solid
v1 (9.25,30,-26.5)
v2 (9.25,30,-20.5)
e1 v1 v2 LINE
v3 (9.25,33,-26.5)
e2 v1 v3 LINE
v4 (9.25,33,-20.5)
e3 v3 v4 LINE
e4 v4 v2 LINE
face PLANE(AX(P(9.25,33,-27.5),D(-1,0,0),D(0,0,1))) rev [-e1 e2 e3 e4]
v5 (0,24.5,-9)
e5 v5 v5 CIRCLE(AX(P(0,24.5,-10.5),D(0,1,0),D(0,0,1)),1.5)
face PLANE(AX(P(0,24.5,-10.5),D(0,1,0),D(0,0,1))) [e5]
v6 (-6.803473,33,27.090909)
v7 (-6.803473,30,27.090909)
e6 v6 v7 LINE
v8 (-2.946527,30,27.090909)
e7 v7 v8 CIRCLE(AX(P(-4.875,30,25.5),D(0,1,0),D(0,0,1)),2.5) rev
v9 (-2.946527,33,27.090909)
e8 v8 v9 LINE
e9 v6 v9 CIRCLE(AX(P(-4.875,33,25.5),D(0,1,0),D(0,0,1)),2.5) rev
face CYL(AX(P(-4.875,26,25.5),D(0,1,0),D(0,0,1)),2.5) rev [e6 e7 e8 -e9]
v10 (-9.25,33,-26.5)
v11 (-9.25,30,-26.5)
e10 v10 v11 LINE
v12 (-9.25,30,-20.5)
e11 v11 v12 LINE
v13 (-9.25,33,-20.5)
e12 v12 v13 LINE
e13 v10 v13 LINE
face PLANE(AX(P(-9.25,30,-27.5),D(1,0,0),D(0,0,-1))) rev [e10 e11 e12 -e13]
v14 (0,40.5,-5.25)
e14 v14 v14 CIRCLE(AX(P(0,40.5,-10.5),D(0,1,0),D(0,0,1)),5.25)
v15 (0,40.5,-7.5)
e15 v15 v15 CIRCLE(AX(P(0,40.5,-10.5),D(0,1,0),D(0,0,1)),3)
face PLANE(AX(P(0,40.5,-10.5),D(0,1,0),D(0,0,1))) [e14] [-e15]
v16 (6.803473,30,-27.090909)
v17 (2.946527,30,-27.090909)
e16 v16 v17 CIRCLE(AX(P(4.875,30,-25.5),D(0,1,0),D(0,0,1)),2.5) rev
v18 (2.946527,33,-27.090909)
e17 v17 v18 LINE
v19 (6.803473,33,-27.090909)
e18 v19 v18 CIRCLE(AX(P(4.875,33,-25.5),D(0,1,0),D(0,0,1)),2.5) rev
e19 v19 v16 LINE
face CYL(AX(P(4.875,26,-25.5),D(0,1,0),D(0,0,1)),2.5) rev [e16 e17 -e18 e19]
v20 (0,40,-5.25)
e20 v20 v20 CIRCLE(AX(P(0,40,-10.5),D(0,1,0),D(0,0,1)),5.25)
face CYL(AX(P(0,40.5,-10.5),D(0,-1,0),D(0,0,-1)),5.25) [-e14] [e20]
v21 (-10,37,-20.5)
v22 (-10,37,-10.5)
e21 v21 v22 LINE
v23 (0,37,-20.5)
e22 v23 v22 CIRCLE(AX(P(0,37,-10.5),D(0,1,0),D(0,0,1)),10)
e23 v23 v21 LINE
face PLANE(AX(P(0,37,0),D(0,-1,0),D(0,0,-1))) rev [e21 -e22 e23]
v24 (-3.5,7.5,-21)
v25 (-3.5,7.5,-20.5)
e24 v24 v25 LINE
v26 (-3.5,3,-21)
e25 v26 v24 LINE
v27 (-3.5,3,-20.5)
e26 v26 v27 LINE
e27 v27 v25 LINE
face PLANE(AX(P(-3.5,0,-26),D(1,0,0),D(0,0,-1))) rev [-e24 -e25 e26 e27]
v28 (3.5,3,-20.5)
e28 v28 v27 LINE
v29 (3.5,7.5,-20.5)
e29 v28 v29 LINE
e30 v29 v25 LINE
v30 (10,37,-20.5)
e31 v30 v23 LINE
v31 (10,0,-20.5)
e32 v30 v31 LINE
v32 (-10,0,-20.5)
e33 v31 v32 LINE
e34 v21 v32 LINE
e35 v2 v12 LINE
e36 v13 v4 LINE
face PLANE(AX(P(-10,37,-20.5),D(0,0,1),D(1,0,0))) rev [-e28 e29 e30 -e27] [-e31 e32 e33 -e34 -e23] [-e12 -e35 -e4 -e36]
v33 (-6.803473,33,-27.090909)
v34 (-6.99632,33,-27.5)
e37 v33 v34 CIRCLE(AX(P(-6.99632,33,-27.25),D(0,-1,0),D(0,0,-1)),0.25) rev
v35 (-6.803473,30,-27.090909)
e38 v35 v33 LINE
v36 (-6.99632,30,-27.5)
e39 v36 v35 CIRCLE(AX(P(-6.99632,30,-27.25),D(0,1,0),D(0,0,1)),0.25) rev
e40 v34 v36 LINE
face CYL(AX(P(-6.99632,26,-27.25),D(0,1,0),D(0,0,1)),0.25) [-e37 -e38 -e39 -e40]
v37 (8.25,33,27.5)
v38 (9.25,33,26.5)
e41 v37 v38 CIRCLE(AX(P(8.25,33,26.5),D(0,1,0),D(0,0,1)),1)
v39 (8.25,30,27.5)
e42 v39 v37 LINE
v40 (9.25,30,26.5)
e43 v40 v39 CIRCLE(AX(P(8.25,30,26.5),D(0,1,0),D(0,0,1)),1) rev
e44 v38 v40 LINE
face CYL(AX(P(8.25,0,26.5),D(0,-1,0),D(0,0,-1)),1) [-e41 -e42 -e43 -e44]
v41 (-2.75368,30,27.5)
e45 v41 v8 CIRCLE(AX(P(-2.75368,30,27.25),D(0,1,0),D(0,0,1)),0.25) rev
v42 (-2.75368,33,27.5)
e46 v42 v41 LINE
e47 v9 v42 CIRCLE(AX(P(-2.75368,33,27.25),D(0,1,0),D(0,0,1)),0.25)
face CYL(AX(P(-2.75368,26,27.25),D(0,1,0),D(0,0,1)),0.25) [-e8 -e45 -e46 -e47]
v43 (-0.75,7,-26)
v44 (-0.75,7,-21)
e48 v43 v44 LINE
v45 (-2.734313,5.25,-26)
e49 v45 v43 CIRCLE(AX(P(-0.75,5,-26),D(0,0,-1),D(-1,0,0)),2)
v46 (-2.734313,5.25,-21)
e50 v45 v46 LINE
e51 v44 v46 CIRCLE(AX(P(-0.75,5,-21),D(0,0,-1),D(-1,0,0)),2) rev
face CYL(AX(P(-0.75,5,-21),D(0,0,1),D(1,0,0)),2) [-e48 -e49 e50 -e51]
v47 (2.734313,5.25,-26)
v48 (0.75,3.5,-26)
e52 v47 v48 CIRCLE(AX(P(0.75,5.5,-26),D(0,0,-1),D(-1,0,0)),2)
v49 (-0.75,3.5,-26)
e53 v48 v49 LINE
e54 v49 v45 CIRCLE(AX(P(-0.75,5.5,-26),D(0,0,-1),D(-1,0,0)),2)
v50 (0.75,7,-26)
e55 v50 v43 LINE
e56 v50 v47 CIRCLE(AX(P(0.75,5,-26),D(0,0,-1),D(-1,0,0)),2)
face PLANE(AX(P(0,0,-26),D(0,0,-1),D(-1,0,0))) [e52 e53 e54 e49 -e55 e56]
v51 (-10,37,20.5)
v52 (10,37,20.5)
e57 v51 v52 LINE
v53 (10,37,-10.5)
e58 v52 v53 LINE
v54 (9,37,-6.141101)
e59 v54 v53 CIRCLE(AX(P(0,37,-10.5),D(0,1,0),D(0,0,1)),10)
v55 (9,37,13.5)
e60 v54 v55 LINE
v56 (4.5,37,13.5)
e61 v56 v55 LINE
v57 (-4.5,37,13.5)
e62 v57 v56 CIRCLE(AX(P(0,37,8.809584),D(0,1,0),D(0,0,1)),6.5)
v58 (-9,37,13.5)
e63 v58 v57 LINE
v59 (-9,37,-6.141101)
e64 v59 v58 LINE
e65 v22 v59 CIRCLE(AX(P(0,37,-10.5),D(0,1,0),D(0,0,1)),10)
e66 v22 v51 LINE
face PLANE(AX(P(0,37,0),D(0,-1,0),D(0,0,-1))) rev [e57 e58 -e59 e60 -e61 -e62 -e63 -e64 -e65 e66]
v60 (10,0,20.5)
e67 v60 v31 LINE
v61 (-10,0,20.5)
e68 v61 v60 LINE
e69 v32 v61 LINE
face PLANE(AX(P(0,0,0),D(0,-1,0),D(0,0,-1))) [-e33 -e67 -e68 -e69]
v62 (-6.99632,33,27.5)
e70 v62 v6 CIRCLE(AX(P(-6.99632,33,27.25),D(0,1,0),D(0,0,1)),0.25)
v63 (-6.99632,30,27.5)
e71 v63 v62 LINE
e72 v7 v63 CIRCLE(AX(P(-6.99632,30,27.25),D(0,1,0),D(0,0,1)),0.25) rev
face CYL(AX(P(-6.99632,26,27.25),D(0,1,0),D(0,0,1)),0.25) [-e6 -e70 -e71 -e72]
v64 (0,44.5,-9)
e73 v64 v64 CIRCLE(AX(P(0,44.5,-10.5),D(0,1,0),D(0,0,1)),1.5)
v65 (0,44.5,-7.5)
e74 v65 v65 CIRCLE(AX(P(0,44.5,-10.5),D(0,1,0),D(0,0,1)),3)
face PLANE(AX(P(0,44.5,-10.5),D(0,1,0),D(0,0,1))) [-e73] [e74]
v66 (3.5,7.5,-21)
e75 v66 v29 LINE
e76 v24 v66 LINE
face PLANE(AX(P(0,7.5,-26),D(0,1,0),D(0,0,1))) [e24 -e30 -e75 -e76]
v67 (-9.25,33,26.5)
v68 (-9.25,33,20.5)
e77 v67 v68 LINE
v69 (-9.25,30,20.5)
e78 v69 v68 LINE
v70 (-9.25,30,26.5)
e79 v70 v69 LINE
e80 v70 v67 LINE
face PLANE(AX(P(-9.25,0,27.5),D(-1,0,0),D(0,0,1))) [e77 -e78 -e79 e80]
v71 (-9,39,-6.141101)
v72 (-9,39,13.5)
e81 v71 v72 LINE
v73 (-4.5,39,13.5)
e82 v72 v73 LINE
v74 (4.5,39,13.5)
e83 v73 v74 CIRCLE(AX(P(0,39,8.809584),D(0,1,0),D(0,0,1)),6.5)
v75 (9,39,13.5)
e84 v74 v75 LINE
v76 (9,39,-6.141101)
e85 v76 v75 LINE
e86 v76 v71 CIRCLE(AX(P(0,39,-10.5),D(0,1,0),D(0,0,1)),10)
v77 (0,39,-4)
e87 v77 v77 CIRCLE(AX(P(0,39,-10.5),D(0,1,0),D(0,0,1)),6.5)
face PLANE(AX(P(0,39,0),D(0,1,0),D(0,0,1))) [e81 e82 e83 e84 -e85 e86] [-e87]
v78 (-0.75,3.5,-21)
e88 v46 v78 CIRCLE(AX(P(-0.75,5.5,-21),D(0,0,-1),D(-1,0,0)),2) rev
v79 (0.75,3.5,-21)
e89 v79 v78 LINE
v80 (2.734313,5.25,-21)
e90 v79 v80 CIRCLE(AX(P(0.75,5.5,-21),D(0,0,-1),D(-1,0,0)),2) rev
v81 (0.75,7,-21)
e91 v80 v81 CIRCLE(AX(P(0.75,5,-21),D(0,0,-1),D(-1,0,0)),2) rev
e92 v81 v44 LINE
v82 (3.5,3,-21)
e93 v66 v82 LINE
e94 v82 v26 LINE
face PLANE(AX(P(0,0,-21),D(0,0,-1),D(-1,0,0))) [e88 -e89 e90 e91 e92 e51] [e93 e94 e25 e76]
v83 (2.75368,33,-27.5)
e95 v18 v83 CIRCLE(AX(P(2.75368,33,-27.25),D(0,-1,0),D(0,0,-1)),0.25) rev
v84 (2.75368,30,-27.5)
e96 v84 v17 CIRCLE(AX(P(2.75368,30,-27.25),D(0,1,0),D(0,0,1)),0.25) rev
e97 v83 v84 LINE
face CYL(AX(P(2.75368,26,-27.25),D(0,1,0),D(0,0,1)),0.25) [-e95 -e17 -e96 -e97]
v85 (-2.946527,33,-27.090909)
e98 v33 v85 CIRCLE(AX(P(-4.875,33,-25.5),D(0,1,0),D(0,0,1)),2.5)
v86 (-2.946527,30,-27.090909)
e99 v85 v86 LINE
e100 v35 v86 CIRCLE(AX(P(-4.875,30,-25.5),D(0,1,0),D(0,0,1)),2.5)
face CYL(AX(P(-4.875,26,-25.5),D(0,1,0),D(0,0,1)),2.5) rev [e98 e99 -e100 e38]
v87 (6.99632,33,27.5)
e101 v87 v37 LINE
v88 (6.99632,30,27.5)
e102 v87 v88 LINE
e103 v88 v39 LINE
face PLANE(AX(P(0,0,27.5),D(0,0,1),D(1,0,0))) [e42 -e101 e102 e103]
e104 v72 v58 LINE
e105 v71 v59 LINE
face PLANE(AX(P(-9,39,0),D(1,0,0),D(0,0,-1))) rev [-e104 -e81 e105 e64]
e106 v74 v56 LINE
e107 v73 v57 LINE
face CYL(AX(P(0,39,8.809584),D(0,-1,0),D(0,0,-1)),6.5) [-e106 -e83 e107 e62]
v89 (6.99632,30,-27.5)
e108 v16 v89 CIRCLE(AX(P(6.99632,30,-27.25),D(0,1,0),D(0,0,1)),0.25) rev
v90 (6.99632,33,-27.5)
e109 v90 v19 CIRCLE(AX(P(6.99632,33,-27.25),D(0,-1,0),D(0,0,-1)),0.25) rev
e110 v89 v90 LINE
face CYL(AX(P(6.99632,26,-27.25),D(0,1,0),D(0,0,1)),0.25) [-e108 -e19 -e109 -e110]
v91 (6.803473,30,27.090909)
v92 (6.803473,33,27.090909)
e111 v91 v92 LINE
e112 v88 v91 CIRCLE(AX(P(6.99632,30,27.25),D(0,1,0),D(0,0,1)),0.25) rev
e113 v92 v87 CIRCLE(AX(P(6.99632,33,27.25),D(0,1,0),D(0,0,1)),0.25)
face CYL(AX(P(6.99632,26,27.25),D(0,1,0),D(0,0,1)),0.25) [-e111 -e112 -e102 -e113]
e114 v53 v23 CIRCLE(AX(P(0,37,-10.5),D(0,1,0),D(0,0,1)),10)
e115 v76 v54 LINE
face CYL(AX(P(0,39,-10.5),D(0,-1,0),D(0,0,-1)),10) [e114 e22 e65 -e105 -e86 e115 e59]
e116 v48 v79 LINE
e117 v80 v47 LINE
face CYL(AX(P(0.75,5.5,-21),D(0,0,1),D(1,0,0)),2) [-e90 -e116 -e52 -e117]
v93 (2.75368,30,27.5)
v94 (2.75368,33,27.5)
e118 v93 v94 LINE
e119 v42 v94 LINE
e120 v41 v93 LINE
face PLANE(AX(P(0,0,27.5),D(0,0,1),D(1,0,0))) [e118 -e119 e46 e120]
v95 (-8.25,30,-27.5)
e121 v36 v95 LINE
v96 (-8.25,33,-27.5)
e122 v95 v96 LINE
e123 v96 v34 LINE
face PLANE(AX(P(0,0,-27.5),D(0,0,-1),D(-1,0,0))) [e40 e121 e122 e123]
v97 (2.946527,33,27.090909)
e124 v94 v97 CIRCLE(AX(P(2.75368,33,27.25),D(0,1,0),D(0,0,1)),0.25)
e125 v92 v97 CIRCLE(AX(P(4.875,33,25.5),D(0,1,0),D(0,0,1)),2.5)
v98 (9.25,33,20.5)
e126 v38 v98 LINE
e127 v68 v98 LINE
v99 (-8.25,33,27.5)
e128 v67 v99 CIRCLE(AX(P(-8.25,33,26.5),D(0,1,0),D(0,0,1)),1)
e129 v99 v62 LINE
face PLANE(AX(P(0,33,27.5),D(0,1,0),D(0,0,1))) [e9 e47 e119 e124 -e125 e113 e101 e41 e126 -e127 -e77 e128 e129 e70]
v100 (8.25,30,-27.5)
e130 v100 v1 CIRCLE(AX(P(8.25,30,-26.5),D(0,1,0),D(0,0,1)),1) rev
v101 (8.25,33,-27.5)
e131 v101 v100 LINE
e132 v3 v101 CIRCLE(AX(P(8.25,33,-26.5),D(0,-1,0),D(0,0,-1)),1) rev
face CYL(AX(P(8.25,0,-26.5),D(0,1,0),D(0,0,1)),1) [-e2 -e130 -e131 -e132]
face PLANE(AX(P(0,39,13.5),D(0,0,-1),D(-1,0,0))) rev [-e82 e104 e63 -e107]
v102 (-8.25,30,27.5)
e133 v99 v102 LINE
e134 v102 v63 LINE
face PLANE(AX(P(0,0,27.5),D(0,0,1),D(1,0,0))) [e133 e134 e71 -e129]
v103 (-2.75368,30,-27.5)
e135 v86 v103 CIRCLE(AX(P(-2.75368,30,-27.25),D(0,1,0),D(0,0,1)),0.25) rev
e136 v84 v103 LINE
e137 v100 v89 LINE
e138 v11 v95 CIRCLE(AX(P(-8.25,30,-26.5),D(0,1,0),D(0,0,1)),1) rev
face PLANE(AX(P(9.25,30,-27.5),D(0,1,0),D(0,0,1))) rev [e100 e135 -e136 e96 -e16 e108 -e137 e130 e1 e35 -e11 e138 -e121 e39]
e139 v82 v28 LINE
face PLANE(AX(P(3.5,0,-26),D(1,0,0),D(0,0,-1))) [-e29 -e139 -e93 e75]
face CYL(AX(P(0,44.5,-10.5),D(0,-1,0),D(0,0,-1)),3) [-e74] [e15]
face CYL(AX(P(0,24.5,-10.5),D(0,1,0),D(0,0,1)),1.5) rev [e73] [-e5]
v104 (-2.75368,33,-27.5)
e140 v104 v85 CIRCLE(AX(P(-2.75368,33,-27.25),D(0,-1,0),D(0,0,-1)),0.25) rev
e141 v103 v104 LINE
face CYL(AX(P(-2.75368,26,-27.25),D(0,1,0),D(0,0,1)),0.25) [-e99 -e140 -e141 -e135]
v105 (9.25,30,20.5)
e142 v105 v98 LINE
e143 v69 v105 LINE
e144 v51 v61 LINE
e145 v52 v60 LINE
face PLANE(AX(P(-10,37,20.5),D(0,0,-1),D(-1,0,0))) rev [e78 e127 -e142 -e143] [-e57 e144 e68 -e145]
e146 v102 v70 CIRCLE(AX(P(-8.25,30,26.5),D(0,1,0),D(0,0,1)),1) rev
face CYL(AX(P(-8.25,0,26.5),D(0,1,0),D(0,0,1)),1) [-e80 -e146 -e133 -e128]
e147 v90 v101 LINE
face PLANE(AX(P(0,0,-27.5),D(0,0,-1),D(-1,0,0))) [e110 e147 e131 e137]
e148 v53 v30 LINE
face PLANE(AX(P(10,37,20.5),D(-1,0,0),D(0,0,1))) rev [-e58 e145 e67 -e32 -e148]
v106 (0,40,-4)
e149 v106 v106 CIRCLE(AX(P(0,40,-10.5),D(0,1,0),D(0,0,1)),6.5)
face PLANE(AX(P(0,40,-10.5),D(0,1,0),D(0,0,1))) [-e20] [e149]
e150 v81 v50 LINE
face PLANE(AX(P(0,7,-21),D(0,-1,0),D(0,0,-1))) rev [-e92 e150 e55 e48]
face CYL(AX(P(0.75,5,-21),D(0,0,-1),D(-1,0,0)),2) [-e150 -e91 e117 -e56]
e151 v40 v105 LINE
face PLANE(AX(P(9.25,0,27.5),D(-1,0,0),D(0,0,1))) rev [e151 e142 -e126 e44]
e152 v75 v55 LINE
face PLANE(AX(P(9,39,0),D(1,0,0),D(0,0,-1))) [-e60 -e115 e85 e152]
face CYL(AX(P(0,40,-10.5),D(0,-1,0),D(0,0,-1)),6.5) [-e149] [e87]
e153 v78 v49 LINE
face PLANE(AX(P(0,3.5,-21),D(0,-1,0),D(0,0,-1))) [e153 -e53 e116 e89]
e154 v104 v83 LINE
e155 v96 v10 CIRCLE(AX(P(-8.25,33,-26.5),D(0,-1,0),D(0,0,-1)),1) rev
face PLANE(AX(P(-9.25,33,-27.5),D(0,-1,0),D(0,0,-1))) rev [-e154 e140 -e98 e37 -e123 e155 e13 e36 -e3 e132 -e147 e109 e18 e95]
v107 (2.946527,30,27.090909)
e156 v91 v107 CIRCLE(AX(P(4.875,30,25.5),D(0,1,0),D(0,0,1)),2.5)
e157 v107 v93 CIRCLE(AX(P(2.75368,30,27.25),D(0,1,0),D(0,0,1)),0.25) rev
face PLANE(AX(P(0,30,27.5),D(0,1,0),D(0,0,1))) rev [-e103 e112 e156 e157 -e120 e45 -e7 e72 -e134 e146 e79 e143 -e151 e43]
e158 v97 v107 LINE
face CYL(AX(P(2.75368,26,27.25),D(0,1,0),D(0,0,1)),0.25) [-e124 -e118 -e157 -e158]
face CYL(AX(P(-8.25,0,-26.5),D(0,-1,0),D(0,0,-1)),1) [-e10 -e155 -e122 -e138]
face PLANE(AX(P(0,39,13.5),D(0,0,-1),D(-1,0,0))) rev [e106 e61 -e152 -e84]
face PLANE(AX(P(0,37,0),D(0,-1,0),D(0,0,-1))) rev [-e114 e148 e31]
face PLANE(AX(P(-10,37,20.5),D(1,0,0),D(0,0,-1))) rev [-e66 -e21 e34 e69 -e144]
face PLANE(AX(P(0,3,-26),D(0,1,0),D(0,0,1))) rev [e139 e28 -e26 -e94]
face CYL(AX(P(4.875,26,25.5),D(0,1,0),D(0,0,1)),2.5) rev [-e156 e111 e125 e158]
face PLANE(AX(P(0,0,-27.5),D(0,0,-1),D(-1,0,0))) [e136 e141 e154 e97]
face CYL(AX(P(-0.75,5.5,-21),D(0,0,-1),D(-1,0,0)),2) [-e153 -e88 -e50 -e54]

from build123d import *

# Parameters (mm, degrees)
SKETCH1_W           = 20
SKETCH1_H           = 41
BOSS_EXTRUDE1_DEPTH = 37
BOSS_EXTRUDE2_DEPTH = 2
SKETCH3_R           = 6.5
BOSS_EXTRUDE3_DEPTH = 1
SKETCH4_R           = 5.25
BOSS_EXTRUDE4_DEPTH = 0.5
SKETCH5_R           = 3
BOSS_EXTRUDE5_DEPTH = 4
SKETCH6_W           = 3.5
SKETCH6_H           = 4.5
BOSS_EXTRUDE6_DEPTH = 5.5
CUT_EXTRUDE1_DEPTH  = 5
SKETCH8_W           = 9.25
SKETCH8_H           = 3
BOSS_EXTRUDE7_DEPTH = 7
SKETCH9_W           = 18.5
SKETCH9_H           = 3
BOSS_EXTRUDE8_DEPTH = 7
FILLET1_R           = 1
SKETCH10_R          = 2.5
CUT_EXTRUDE2_DEPTH  = 7
SKETCH11_R          = 1.5
CUT_EXTRUDE3_DEPTH  = 20
FILLET2_R           = 0.25
FILLET3_R           = 2


with BuildPart() as part:
    # Sketch1 → Boss-Extrude1 (new body)
    with BuildSketch(Plane(origin=(0, 0, 0), x_dir=(1, 0, 0), z_dir=(0, 1, 0))):
        Rectangle(SKETCH1_W, SKETCH1_H)
    extrude(amount=BOSS_EXTRUDE1_DEPTH)

    # Sketch2 → Boss-Extrude2 (add)
    with BuildSketch(Plane(origin=(0, 37, 0), x_dir=(1, 0, 0), z_dir=(0, 1, 0))):
        with BuildLine():
            Line((-9, 6.141101056), (-9, -13.5))
            Line((-9, -13.5), (-4.5, -13.5))
            ThreePointArc((-4.5, -13.5), (0, -15.30958424), (4.5, -13.5))
            Line((4.5, -13.5), (9, -13.5))
            Line((9, -13.5), (9, 6.141101056))
            ThreePointArc((9, 6.141101056), (0, 20.5), (-9, 6.141101056))
        make_face()
    extrude(amount=BOSS_EXTRUDE2_DEPTH)

    # Sketch3 → Boss-Extrude3 (add)
    with BuildSketch(Plane(origin=(0, 39, 0), x_dir=(1, 0, 0), z_dir=(0, 1, 0))):
        with Locations(Location((0, 10.5, 0), (0, 0, 270))):
            Circle(SKETCH3_R)
    extrude(amount=BOSS_EXTRUDE3_DEPTH)

    # Sketch4 → Boss-Extrude4 (add)
    with BuildSketch(Plane(origin=(0, 40, 0), x_dir=(1, 0, 0), z_dir=(0, 1, 0))):
        with Locations(Location((0, 10.5, 0), (0, 0, 270))):
            Circle(SKETCH4_R)
    extrude(amount=BOSS_EXTRUDE4_DEPTH)

    # Sketch5 → Boss-Extrude5 (add)
    with BuildSketch(Plane(origin=(0, 40.5, 0), x_dir=(1, 0, 0), z_dir=(0, 1, 0))):
        with Locations(Location((0, 10.5, 0), (0, 0, 270))):
            Circle(SKETCH5_R)
    extrude(amount=BOSS_EXTRUDE5_DEPTH)

    # Sketch6 → Boss-Extrude6 (add)
    with BuildSketch(Plane(origin=(0, 0, -20.5), x_dir=(-1, 0, 0), z_dir=(0, 0, -1))):
        with Locations((-1.75, 5.25)):
            Rectangle(SKETCH6_W, SKETCH6_H)
        with Locations((1.75, 5.25)):
            Rectangle(SKETCH6_W, SKETCH6_H)
    extrude(amount=BOSS_EXTRUDE6_DEPTH)

    # Sketch7 → Cut-Extrude1 (cut)
    with BuildSketch(Plane(origin=(0, 0, -26), x_dir=(-1, 0, 0), z_dir=(0, 0, -1))):
        Polygon((3.5, 7.5), (0, 7.5), (0, 7), (2.75, 7), (2.75, 3.5), (0, 3.5), (0, 3), (3.5, 3), align=None)
        Polygon((0, 7), (0, 7.5), (-3.5, 7.5), (-3.5, 3), (0, 3), (0, 3.5), (-2.75, 3.5), (-2.75, 7), align=None)
    extrude(amount=-CUT_EXTRUDE1_DEPTH, mode=Mode.SUBTRACT)

    # Sketch8 → Boss-Extrude7 (add)
    with BuildSketch(Plane.XY.offset(20.5)):
        with Locations((4.625, 31.5)):
            Rectangle(SKETCH8_W, SKETCH8_H)
        with Locations((-4.625, 31.5)):
            Rectangle(SKETCH8_W, SKETCH8_H)
    extrude(amount=BOSS_EXTRUDE7_DEPTH)

    # Sketch9 → Boss-Extrude8 (add)
    with BuildSketch(Plane(origin=(0, 0, -20.5), x_dir=(-1, 0, 0), z_dir=(0, 0, -1))):
        with Locations((0, 31.5)):
            Rectangle(SKETCH9_W, SKETCH9_H)
    extrude(amount=BOSS_EXTRUDE8_DEPTH)

    # Fillet1
    fillet1_edges = [part.edges().sort_by_distance(p)[0] for p in [
        (-9.25, 31.5, -27.5),
        (9.25, 31.5, -27.5),
        (-9.25, 31.5, 27.5),
        (9.25, 31.5, 27.5),
    ]]
    fillet(fillet1_edges, radius=FILLET1_R)

    # Sketch10 → Cut-Extrude2 (cut)
    with BuildSketch(Plane(origin=(0, 33, 0), x_dir=(1, 0, 0), z_dir=(0, 1, 0))):
        with Locations((-4.875, 25.5)):
            Circle(SKETCH10_R)
        with Locations((4.875, 25.5)):
            Circle(SKETCH10_R)
        with Locations((4.875, -25.5)):
            Circle(SKETCH10_R)
        with Locations((-4.875, -25.5)):
            Circle(SKETCH10_R)
    extrude(amount=-CUT_EXTRUDE2_DEPTH, mode=Mode.SUBTRACT)

    # Sketch11 → Cut-Extrude3 (cut)
    with BuildSketch(Plane(origin=(0, 44.5, 0), x_dir=(1, 0, 0), z_dir=(0, 1, 0))):
        with Locations(Location((0, 10.5, 0), (0, 0, 270))):
            Circle(SKETCH11_R)
    extrude(amount=-CUT_EXTRUDE3_DEPTH, mode=Mode.SUBTRACT)

    # Fillet2
    fillet2_edges = [part.edges().sort_by_distance(p)[0] for p in [
        (-3.375, 31.5, -27.5),
        (-6.375, 31.5, -27.5),
        (6.375, 31.5, -27.5),
        (3.375, 31.5, -27.5),
        (3.375, 31.5, 27.5),
        (6.375, 31.5, 27.5),
        (-6.375, 31.5, 27.5),
        (-3.375, 31.5, 27.5),
    ]]
    fillet(fillet2_edges, radius=FILLET2_R)

    # Fillet3
    # the kernel refuses this fillet: 2 mm, written as the material it takes off along each edge
    with BuildSketch(Plane(origin=(2.75, 7, -31), x_dir=(-1, 0, 0), z_dir=(0, 0, 1))) as fillet3_piece_1:
        with BuildLine():
            CenterArc((FILLET3_R, FILLET3_R), FILLET3_R, 180, 90)
            Line((0, FILLET3_R), (0, 0))
            Line((0, 0), (FILLET3_R, 0))
        make_face()
    extrude(amount=10, mode=Mode.SUBTRACT)
    with BuildSketch(Plane(origin=(-2.75, 7, -31), x_dir=(1, 0, 0), z_dir=(0, 0, 1)), Plane(origin=(-2.75, 3.5, -31), x_dir=(0, 1, 0), z_dir=(0, 0, 1)), Plane(origin=(2.75, 3.5, -31), x_dir=(-1, 0, 0), z_dir=(0, 0, 1))) as fillet3_piece_2:
        with BuildLine():
            CenterArc((FILLET3_R, -FILLET3_R), FILLET3_R, 90, 90)
            Line((0, -FILLET3_R), (0, 0))
            Line((0, 0), (FILLET3_R, 0))
        make_face()
    extrude(amount=10, mode=Mode.SUBTRACT)


solid = part.part
